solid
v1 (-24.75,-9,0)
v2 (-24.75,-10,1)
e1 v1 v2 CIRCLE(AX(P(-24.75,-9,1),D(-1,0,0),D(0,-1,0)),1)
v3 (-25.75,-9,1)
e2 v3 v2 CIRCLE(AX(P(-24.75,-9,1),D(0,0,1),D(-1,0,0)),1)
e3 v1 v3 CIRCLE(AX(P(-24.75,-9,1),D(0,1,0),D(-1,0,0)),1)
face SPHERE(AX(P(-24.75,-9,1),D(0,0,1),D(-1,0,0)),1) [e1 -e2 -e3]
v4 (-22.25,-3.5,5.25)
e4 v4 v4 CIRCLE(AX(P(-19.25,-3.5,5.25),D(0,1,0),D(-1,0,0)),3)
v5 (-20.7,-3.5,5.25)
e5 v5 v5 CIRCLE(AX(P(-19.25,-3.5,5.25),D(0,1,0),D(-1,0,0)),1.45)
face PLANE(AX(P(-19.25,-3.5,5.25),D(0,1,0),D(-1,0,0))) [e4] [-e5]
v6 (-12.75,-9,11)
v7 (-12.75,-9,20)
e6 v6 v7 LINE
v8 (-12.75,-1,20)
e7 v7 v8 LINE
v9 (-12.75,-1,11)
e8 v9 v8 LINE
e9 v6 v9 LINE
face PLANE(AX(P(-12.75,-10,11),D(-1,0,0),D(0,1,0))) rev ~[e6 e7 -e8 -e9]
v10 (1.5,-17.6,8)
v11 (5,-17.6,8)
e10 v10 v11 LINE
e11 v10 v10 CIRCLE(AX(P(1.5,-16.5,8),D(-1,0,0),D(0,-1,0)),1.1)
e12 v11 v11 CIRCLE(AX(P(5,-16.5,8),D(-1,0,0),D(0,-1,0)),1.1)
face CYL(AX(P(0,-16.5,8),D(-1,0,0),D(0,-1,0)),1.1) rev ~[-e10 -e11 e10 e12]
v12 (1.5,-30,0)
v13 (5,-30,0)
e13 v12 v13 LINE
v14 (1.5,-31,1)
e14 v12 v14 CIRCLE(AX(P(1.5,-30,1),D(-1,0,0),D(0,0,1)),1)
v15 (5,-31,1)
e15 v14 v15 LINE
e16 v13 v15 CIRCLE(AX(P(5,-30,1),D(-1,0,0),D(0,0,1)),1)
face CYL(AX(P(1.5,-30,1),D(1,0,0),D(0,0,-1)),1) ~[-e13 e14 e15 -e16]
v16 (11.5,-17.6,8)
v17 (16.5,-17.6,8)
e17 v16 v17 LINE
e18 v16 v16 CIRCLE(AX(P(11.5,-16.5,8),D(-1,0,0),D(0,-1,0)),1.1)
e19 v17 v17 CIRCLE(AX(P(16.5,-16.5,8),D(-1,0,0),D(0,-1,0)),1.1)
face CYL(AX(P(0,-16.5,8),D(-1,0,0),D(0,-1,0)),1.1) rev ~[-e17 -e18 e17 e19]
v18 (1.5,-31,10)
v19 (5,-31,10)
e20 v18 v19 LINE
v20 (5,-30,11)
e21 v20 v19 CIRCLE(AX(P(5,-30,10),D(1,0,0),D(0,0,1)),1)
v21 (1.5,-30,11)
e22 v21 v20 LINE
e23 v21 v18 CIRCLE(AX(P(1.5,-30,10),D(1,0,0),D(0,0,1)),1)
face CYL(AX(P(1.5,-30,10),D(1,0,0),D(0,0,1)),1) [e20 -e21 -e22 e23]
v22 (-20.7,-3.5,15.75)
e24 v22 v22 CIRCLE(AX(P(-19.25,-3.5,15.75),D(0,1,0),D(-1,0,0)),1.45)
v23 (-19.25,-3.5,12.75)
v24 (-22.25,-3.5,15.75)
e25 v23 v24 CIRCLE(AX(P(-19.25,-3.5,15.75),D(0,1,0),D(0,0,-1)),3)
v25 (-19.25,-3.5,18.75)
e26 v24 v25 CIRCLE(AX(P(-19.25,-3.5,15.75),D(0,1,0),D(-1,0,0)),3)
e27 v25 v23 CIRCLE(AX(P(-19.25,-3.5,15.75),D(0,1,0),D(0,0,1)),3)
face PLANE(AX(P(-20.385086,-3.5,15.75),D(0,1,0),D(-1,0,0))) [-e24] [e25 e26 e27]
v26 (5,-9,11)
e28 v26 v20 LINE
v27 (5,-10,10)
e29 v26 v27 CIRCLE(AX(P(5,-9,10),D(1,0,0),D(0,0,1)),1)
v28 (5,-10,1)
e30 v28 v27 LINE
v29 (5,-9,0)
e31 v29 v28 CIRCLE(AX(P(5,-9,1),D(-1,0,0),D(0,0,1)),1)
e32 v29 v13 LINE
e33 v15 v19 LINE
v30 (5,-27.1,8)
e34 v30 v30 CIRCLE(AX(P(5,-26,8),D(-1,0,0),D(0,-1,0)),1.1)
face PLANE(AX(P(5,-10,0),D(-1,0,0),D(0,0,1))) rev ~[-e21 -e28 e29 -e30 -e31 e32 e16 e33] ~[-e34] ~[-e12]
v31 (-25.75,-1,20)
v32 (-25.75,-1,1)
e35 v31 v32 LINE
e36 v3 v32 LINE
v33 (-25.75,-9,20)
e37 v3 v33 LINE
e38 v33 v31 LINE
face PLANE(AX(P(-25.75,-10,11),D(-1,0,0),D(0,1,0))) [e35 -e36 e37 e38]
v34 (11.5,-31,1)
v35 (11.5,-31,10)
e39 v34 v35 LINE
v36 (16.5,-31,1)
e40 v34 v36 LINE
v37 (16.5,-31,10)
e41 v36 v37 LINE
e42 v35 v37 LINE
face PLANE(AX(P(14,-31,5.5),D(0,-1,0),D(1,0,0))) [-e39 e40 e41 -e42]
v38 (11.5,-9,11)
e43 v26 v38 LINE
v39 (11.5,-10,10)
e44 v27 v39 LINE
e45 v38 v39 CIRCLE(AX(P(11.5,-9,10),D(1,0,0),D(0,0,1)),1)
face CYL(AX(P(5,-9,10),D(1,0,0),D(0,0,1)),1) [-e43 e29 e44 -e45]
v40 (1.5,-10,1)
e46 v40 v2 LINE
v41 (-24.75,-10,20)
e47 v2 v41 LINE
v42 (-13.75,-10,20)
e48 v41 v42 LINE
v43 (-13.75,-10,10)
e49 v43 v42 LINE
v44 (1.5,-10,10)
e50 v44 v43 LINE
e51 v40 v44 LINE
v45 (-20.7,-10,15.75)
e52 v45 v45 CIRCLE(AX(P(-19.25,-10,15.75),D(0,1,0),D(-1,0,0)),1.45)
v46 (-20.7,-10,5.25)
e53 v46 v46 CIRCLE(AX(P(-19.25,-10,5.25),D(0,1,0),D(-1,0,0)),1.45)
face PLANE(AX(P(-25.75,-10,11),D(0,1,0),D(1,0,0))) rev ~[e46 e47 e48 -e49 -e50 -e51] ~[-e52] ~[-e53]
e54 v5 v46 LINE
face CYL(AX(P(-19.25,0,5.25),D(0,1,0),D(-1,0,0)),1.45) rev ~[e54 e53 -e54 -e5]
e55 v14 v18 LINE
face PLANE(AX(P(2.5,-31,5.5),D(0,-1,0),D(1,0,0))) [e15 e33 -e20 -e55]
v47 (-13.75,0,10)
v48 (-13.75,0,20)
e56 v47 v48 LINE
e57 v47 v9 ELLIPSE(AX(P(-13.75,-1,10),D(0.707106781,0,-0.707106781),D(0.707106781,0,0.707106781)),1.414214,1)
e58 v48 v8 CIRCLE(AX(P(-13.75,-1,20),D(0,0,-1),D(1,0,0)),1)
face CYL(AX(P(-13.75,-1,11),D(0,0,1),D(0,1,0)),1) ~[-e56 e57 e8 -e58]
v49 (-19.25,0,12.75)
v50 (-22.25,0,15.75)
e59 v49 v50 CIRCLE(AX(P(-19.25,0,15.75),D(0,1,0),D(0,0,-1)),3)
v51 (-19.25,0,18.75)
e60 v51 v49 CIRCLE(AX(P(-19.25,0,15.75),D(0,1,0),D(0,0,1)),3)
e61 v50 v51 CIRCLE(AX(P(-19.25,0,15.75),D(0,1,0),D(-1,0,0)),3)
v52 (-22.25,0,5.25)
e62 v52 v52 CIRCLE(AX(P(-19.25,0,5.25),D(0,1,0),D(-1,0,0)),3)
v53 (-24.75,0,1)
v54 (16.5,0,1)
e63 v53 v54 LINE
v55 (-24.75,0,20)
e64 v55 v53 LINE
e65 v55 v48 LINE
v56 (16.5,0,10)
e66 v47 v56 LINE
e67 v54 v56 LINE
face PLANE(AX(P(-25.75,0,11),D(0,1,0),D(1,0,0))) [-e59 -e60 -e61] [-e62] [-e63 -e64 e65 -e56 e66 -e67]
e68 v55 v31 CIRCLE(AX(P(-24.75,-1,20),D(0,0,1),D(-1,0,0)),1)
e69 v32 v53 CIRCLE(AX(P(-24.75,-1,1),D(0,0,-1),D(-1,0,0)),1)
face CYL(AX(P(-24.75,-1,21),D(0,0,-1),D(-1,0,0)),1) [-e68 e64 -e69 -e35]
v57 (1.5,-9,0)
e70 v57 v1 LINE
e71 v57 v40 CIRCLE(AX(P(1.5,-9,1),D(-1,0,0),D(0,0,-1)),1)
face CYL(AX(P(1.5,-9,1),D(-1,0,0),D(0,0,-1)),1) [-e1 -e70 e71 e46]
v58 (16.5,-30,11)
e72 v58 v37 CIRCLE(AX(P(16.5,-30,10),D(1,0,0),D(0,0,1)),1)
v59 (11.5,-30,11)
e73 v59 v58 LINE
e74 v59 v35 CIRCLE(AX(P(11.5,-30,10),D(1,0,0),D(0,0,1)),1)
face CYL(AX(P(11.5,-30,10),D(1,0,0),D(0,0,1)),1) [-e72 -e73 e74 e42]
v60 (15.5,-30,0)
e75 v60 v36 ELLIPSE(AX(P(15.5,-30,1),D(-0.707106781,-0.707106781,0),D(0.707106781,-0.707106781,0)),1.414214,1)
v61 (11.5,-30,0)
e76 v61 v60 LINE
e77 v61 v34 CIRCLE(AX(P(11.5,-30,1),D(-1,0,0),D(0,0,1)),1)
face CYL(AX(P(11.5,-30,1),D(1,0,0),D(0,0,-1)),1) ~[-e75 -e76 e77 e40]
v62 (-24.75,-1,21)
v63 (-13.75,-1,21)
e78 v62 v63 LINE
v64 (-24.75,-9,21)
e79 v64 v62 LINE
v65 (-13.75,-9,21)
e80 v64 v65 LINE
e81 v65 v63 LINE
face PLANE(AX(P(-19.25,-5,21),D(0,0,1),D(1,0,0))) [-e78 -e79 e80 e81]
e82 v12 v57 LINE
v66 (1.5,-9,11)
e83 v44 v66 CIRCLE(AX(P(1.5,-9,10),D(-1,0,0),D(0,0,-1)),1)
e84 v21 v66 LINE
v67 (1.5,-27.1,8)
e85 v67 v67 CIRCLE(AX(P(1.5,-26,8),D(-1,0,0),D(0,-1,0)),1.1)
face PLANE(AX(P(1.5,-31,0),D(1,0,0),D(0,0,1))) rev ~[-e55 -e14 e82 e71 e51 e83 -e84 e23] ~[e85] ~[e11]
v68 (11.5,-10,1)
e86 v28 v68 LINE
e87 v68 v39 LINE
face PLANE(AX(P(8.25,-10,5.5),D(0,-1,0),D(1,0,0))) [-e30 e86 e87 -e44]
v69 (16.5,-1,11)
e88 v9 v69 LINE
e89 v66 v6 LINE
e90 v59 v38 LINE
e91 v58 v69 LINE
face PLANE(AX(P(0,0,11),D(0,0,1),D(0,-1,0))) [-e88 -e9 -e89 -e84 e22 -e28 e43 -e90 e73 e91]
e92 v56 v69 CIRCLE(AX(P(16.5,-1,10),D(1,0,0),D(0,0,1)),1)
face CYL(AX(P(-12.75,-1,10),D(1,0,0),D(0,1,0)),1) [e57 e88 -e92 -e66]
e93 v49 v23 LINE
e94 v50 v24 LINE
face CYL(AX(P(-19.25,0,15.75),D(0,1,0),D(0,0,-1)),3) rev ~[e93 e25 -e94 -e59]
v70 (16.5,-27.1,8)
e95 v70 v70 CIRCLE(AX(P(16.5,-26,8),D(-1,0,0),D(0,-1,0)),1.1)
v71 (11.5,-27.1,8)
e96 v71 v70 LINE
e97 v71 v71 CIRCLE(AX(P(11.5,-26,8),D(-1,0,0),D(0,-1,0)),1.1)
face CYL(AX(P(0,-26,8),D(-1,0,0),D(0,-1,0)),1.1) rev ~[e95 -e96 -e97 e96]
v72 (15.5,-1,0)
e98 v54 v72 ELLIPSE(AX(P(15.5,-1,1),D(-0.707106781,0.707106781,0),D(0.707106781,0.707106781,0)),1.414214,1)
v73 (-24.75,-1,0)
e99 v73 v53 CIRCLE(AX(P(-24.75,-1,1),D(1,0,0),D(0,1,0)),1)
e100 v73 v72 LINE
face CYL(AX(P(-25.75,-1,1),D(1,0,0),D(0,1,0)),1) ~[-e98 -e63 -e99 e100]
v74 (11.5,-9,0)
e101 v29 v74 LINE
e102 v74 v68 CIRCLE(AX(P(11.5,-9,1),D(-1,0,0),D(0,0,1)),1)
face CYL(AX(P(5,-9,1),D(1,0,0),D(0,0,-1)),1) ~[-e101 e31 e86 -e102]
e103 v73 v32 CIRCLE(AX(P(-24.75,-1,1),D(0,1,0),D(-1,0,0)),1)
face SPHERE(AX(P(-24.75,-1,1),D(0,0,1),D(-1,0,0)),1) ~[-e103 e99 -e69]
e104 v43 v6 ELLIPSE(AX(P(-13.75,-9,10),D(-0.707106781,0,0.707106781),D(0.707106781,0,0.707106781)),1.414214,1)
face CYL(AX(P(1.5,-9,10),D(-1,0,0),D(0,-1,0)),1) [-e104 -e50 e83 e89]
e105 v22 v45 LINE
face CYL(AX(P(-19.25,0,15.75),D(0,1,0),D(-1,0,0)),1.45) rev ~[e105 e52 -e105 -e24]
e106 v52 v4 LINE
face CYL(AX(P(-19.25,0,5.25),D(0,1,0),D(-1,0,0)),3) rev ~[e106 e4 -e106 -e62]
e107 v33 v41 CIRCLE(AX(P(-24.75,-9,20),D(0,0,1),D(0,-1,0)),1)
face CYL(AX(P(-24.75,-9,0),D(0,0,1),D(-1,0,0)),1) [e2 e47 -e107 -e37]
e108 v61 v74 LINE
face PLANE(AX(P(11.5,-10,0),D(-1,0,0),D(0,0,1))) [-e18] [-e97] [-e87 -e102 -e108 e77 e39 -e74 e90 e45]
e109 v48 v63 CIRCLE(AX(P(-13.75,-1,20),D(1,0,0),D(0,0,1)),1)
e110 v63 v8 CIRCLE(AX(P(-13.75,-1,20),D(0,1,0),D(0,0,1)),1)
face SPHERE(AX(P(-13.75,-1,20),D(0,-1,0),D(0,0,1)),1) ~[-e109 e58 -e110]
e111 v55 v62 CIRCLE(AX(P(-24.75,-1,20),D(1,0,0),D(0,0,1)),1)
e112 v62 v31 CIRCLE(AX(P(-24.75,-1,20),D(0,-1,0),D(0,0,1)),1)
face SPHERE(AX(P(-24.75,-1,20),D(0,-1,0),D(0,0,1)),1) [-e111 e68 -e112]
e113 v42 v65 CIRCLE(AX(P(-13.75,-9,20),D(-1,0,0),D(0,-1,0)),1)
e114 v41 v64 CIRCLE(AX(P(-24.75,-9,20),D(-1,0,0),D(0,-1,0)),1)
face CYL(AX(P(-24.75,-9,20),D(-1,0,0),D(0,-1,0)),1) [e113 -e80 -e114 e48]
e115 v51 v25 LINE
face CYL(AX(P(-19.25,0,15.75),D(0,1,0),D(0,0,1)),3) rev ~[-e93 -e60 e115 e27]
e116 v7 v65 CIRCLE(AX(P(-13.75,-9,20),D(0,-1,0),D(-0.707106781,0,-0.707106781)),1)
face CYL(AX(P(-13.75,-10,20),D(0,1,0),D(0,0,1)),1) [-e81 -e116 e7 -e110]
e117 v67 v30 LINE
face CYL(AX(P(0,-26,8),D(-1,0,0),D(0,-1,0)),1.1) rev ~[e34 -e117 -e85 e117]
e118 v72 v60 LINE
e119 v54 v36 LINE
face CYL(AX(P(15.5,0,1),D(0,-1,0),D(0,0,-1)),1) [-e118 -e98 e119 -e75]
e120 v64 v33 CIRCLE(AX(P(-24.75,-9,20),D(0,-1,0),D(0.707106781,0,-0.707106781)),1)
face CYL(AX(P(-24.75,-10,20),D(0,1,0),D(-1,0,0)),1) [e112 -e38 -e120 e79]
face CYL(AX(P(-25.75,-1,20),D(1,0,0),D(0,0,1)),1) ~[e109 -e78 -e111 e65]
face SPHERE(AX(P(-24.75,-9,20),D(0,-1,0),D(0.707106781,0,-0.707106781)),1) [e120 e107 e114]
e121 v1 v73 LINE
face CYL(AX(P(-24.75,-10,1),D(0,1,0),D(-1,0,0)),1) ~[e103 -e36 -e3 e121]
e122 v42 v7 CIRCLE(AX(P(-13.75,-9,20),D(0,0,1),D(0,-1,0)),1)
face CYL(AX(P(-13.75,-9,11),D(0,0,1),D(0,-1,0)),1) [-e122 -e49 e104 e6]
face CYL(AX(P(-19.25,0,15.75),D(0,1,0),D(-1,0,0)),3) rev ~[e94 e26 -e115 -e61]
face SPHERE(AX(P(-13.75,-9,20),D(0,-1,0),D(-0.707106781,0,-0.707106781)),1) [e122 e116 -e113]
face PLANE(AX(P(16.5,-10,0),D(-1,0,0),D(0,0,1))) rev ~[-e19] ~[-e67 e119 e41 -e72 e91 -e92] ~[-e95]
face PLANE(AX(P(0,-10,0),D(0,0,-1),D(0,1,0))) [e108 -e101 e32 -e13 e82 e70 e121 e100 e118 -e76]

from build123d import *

# Parameters (mm, degrees)
F0_W          = 16.5
F0_H          = 11
F1_DEPTH      = 10
F2_W          = 5
F2_H          = 11
F3_DEPTH      = 21
F4_R          = 1.1
F5_DEPTH      = 25
F6_W          = 1.5
F6_H          = 11
F7_DEPTH      = 21
F8_DEPTH      = 25.75
F9_W          = 13
F9_H          = 10
F10_DEPTH     = 10
F11_R         = 3
F12_DEPTH     = 3.5
F13_R         = 1.45
F14_DEPTH     = 25
F15_R         = 1
F16_T1_DEPTH  = 11
F16_S5_W      = 1
F16_S5_H      = 1
F16_T6_DEPTH  = 1
F16_S11_W     = 1
F16_S11_H     = 1
F16_T12_DEPTH = 1


# Not quite as in the source:
# - a fillet or chamfer that OpenCascade refuses, or shapes differently, is made with other operations: its cross-section is extruded or revolved along the edge and cut away or added


with BuildPart() as f1:
    # F0 (on Front) → F1 (new body)
    with BuildSketch(Plane.XZ):
        with Locations((8.25, 5.5)):
            Rectangle(F0_W, F0_H)
    extrude(amount=F1_DEPTH)

    # F2 (on face) → F3 (join)
    with BuildSketch(Plane.XZ.offset(10)):
        with Locations((14, 5.5)):
            Rectangle(F2_W, F2_H)
        with Locations((2.5, 5.5)):
            Rectangle(F2_W, F2_H)
    extrude(amount=F3_DEPTH)

    # F4 (on face) → F5 (cut)
    with BuildSketch(Plane(origin=(0, 0, 0), x_dir=(0, -1, 0), z_dir=(-1, 0, 0))):
        with BuildLine():
            ThreePointArc((24.9, 8), (26, 6.9), (27.1, 8))
            Line((27.1, 8), (26, 8))
            Line((26, 8), (24.9, 8))
        make_face()
        with BuildLine():
            Line((26, 8), (27.1, 8))
            ThreePointArc((27.1, 8), (26, 9.1), (24.9, 8))
            Line((24.9, 8), (26, 8))
        make_face()
        with Locations((16.5, 8)):
            Circle(F4_R)
    extrude(amount=-F5_DEPTH, mode=Mode.SUBTRACT)

    # F6 (on face) → F7 (cut)
    with BuildSketch(Plane.XZ.offset(31)):
        with Locations((0.75, 5.5)):
            Rectangle(F6_W, F6_H)
    extrude(amount=-F7_DEPTH, mode=Mode.SUBTRACT)

    # F8 (add): a face of the model
    f8_faces = [f1.faces().sort_by_distance(p)[0] for p in [
        (0, -5, 5.5),
    ]]
    extrude(f8_faces, amount=F8_DEPTH)

    # F9 (on face) → F10 (join)
    with BuildSketch(Plane.XY.offset(11)):
        with Locations((-19.25, -5)):
            Rectangle(F9_W, F9_H)
    extrude(amount=F10_DEPTH)

    # F11 (on face) → F12 (cut)
    with BuildSketch(Plane(origin=(0, 0, 0), x_dir=(-1, 0, 0), z_dir=(0, 1, 0))):
        with BuildLine():
            ThreePointArc((22.25, 15.75), (21.3713203436, 17.8713203436), (19.25, 18.75))
            Line((19.25, 18.75), (19.25, 12.75))
            ThreePointArc((19.25, 12.75), (21.3713203436, 13.6286796564), (22.25, 15.75))
        make_face()
        with BuildLine():
            Line((19.25, 12.75), (19.25, 18.75))
            ThreePointArc((19.25, 18.75), (16.25, 15.75), (19.25, 12.75))
        make_face()
        with Locations((19.25, 5.25)):
            Circle(F11_R)
    extrude(amount=-F12_DEPTH, mode=Mode.SUBTRACT)

    # F13 (on face) → F14 (cut)
    with BuildSketch(Plane(origin=(0, 0, 0), x_dir=(-1, 0, 0), z_dir=(0, 1, 0))):
        with Locations((19.25, 15.75)):
            Circle(F13_R)
        with Locations((19.25, 5.25)):
            Circle(F13_R)
    extrude(amount=-F14_DEPTH, mode=Mode.SUBTRACT)

    # F15
    f15_edges = [f1.edges().sort_by_distance(p)[0] for p in [
        (-12.75, -5, 21),
        (-25.75, -5, 21),
        (-19.25, 0, 21),
        (-25.75, 0, 10.5),
        (-25.75, -10, 10.5),
        (-25.75, -5, 0),
        (-4.625, 0, 0),
        (-12.125, -10, 0),
        (-12.75, 0, 16),
        (-12.75, -10, 16),
        (1.875, 0, 11),
        (-5.625, -10, 11),
        (8.25, -10, 11),
        (8.25, -10, 0),
        (3.25, -31, 11),
        (14, -31, 11),
        (14, -31, 0),
        (16.5, -15.5, 0),
        (3.25, -31, 0),
    ]]
    fillet(f15_edges, radius=F15_R)

    # F16: fillet of radius 1 on 1 edges, made by hand

    # F16_s2 → F16_t1 (cut)
    with BuildSketch(Plane.YZ.offset(-24.75)):
        with BuildLine():
            ThreePointArc((-10, 20), (-9.7071067812, 20.7071067812), (-9, 21))
            Line((-9, 21), (-10, 21))
            Line((-10, 21), (-10, 20))
        make_face()
    extrude(amount=F16_T1_DEPTH, mode=Mode.SUBTRACT)


with BuildPart() as f16_tool4:
    # F16_s5 → F16_t6 (new body)
    with BuildSketch(Plane.XZ.offset(9)):
        with Locations((-25.25, 20.5)):
            Rectangle(F16_S5_W, F16_S5_H)
    extrude(amount=F16_T6_DEPTH)

    # F16_s7 → F16_t8 (revolve, cut)
    with BuildSketch(Plane(origin=(-24.75, -9, 20), x_dir=(0.7071067812, 0, -0.7071067812), z_dir=(-0.7071067812, 0, -0.7071067812))):
        with BuildLine():
            ThreePointArc((0, -1), (1, 0), (0, 1))
            Line((0, 1), (0, -1))
        make_face()
    revolve(axis=Axis((-24.75, -9, 20), (0, -1, 0)), mode=Mode.SUBTRACT)


with BuildPart() as f1_1:
    add(f1.part)

    # F16_t3: cut F16_tool4
    add(f16_tool4.part, mode=Mode.SUBTRACT)


with BuildPart() as f16_tool10:
    # F16_s11 → F16_t12 (new body)
    with BuildSketch(Plane.XZ.offset(9)):
        with Locations((-13.25, 20.5)):
            Rectangle(F16_S11_W, F16_S11_H)
    extrude(amount=F16_T12_DEPTH)

    # F16_s13 → F16_t14 (revolve, cut)
    with BuildSketch(Plane(origin=(-13.75, -9, 20), x_dir=(-0.7071067812, 0, -0.7071067812), z_dir=(-0.7071067812, 0, 0.7071067812))):
        with BuildLine():
            ThreePointArc((0, -1), (1, 0), (0, 1))
            Line((0, 1), (0, -1))
        make_face()
    revolve(axis=Axis((-13.75, -9, 20), (0, -1, 0)), mode=Mode.SUBTRACT)


with BuildPart() as f1_2:
    add(f1_1.part)

    # F16_t9: cut F16_tool10
    add(f16_tool10.part, mode=Mode.SUBTRACT)


solid = f1_2.part
